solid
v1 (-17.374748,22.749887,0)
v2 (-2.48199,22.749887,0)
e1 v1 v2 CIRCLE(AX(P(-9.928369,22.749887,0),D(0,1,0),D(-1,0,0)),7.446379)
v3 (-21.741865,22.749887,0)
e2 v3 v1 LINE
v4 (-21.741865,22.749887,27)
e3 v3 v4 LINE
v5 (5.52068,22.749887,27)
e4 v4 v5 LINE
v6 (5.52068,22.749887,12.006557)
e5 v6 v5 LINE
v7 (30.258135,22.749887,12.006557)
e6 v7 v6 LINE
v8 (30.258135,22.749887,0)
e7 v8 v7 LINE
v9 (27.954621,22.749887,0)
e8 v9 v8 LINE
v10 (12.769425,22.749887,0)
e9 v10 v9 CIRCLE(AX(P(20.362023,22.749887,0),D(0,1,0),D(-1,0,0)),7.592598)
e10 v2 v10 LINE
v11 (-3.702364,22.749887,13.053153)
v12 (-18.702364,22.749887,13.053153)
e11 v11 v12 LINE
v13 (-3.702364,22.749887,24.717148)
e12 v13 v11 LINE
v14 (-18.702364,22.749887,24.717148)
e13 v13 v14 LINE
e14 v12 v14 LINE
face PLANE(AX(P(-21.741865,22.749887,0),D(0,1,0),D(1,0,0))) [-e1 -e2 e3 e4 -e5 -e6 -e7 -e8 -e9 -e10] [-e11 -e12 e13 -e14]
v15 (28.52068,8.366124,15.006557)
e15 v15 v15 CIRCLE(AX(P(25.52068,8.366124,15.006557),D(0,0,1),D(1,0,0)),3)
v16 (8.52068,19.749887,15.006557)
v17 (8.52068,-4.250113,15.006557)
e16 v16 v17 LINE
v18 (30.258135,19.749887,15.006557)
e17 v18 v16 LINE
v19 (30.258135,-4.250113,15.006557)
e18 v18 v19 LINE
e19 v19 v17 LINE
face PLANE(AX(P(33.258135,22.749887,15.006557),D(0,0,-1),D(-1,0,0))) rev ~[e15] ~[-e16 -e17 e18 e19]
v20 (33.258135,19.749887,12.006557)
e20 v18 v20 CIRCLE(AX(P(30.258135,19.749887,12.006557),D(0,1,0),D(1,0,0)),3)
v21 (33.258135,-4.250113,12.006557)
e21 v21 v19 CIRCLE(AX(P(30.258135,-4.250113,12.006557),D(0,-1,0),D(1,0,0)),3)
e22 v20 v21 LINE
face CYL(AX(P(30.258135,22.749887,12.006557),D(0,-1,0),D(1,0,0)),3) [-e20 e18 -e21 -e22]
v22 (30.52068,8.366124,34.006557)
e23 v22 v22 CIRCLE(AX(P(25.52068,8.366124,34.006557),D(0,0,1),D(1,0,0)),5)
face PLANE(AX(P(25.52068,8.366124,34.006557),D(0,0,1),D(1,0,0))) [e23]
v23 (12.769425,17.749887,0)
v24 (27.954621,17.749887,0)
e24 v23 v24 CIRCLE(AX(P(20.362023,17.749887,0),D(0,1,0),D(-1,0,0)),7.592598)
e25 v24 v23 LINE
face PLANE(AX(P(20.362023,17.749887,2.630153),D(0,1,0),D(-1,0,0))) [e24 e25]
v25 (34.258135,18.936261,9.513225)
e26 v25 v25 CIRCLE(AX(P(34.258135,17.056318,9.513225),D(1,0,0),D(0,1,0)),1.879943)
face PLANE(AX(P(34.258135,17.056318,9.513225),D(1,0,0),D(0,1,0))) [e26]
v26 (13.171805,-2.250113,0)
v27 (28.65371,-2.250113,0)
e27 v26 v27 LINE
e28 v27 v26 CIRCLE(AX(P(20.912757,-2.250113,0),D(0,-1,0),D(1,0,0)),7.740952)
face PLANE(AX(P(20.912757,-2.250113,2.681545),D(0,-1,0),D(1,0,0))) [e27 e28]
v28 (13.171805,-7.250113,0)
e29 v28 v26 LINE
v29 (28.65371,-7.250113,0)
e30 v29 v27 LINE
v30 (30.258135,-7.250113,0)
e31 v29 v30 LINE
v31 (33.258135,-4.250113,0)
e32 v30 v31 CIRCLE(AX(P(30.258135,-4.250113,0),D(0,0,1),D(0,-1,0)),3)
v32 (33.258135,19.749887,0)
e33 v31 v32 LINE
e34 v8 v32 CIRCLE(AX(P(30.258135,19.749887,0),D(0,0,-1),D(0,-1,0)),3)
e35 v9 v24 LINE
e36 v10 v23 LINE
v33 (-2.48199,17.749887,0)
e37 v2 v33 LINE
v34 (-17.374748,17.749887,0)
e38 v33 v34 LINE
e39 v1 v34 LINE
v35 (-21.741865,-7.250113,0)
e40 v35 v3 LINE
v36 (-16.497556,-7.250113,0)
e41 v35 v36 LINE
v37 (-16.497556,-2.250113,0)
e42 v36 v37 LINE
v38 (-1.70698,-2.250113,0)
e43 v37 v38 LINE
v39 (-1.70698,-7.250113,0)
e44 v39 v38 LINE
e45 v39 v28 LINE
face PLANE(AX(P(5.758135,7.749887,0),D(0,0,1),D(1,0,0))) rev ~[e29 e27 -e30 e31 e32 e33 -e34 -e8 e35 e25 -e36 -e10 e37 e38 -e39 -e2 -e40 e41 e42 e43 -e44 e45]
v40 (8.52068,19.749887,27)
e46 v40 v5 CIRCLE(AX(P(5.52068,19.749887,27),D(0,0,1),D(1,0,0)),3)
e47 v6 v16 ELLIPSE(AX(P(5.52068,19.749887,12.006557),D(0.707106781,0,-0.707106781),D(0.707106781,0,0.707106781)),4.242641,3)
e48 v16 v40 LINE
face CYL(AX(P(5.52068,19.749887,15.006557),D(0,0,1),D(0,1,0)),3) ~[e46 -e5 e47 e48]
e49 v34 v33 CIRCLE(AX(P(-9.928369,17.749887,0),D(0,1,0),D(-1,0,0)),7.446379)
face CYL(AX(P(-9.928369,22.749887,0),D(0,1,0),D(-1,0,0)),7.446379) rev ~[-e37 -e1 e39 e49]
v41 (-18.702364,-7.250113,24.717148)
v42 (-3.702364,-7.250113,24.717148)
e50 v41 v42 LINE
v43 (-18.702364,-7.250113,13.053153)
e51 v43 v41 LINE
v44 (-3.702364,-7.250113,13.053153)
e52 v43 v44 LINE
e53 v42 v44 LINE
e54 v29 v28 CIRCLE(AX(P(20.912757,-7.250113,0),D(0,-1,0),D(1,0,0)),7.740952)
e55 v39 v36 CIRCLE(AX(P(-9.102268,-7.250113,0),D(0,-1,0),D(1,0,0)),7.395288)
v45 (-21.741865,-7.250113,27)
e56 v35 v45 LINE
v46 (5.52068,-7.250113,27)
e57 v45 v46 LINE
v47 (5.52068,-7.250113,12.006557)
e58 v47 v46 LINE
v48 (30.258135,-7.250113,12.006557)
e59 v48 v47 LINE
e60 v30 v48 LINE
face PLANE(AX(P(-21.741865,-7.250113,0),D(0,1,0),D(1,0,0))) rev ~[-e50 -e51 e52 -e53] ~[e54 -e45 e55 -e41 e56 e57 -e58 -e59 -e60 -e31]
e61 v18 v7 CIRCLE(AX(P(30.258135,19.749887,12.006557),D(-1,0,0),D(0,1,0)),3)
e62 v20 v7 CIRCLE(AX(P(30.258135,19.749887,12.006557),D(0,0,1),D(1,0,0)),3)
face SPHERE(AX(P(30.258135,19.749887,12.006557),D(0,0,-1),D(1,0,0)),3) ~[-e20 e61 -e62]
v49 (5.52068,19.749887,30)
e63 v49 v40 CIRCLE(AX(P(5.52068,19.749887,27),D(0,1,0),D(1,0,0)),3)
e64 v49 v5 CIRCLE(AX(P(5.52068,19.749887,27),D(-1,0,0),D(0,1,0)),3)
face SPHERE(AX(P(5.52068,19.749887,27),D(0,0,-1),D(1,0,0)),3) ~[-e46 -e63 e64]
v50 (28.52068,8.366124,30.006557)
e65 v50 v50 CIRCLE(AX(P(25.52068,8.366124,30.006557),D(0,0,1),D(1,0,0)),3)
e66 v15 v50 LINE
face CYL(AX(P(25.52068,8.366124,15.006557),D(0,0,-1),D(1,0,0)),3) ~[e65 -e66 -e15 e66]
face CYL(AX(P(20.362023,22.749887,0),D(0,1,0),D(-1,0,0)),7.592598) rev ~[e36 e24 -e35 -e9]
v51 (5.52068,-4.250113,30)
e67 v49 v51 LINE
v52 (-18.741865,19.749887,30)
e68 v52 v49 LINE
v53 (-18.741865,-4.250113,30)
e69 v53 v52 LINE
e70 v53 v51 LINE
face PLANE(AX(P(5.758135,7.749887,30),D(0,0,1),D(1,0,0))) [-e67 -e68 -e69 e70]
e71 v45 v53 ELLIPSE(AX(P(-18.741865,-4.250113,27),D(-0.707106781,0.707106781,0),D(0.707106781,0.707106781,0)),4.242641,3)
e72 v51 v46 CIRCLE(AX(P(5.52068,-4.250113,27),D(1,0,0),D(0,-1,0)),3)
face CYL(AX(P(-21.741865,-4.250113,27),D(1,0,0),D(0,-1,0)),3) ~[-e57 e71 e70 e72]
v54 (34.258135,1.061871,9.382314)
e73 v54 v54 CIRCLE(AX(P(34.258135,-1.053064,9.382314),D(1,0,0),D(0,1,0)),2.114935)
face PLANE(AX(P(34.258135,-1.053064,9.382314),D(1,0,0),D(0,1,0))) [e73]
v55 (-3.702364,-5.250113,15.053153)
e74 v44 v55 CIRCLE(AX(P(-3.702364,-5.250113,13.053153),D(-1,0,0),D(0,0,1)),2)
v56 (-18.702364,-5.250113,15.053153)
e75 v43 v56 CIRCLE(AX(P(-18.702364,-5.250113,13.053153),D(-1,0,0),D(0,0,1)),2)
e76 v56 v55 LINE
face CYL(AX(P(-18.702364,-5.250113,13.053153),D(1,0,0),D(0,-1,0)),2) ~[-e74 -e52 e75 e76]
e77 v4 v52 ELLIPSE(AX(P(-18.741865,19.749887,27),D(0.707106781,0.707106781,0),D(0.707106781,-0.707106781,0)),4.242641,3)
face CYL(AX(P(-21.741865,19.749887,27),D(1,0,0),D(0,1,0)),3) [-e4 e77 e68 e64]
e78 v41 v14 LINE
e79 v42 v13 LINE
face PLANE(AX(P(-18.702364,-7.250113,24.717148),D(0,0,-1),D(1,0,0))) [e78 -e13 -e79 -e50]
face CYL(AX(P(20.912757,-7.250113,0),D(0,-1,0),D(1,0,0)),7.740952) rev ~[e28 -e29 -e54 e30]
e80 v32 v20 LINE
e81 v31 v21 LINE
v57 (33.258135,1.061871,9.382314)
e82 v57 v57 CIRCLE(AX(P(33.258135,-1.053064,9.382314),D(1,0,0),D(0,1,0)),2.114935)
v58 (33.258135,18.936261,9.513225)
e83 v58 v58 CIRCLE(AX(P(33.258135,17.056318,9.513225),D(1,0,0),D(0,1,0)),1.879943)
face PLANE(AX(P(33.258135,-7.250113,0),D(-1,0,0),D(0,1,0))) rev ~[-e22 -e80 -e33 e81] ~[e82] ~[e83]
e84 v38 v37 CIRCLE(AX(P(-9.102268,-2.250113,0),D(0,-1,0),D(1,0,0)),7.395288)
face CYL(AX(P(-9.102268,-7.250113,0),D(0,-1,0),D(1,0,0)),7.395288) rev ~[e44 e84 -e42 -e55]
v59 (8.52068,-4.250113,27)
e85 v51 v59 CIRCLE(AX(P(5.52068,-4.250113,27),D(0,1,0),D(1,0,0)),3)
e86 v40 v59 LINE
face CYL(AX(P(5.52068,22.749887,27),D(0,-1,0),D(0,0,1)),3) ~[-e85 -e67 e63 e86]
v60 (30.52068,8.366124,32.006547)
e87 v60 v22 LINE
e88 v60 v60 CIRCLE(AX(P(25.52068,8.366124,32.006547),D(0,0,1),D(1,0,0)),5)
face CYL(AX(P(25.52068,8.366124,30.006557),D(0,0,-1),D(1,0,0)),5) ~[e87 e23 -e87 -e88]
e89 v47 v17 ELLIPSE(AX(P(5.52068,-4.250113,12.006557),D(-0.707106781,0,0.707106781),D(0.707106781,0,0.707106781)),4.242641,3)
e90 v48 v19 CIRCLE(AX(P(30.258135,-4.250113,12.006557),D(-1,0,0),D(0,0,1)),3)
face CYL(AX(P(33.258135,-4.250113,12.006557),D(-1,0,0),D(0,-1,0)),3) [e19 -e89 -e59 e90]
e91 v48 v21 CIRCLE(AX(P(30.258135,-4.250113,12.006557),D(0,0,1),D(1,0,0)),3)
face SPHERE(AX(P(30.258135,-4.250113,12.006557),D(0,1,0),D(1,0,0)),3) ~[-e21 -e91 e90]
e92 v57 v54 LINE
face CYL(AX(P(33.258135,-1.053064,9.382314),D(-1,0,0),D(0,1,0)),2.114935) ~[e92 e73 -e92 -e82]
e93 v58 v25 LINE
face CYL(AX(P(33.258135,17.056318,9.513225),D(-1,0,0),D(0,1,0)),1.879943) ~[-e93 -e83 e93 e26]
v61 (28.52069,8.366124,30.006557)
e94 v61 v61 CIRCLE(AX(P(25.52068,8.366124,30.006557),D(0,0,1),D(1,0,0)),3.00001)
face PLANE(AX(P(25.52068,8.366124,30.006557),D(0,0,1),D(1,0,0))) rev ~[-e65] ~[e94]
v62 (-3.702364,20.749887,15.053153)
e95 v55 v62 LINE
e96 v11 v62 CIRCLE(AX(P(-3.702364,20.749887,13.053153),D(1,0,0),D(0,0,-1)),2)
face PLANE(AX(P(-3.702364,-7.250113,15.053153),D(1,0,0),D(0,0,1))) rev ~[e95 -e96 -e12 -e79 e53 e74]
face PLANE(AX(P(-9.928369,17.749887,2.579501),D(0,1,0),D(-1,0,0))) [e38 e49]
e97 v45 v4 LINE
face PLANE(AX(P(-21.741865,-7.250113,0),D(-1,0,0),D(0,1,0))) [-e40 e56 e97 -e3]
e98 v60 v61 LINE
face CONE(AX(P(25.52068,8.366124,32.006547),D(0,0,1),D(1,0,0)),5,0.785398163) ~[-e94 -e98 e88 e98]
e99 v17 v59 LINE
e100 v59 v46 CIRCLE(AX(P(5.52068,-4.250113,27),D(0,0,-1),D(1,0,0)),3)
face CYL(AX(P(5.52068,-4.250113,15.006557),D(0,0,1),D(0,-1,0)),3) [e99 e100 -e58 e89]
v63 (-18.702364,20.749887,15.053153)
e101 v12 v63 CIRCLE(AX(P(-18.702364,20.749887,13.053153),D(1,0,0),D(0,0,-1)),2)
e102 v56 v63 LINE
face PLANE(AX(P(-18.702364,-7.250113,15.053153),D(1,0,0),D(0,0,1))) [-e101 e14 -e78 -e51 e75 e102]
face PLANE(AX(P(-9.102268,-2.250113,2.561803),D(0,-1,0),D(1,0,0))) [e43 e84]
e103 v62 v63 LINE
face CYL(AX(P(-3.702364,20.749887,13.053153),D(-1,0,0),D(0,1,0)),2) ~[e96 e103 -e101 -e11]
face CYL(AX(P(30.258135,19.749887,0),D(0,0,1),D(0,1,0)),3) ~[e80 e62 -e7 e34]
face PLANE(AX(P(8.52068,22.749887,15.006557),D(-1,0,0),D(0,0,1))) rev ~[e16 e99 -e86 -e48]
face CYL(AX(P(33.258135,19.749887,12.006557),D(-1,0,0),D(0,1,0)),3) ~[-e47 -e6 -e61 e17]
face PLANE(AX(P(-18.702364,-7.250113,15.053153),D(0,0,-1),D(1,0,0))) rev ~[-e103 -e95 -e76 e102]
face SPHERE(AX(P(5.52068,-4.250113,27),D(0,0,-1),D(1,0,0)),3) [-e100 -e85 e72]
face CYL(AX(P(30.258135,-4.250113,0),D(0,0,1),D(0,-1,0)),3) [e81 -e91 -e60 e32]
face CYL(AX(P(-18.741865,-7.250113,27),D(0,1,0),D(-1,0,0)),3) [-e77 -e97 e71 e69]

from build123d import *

# Parameters (mm, degrees)
F0_W      = 55
F0_H      = 30
F1_DEPTH  = 30
F2_W      = 24.7374541685
F2_H      = 14.993442893
F3_DEPTH  = 35
F5_DEPTH  = 5
F7_DEPTH  = 5
F8_R      = 3
F9_W      = 15
F9_H      = 9.6639953554
F10_DEPTH = 33.1
F11_R     = 2
F12_R     = 2.1149349852
F12_R_2   = 1.8799425549
F13_DEPTH = 1
F14_R     = 3
F15_DEPTH = 15
F16_R     = 5
F17_DEPTH = 4
F18_SIZE  = 1.99999


# Not quite as in the source:
# - a fillet or chamfer is up to 0.001 mm smaller than in the source, because OpenCascade refuses the exact size


with BuildPart() as f1:
    # F0 (on Top) → F1 (new body)
    with BuildSketch(Plane.XY):
        with Locations((5.7581346482, 7.7498872403)):
            Rectangle(F0_W, F0_H)
    extrude(amount=F1_DEPTH)

    # F2 (on face) → F3 (cut)
    with BuildSketch(Plane(origin=(0, 22.7498872403, 0), x_dir=(-1, 0, 0), z_dir=(0, 1, 0))):
        with Locations((-20.889407564, 22.5032785535)):
            Rectangle(F2_W, F2_H)
    extrude(amount=-F3_DEPTH, mode=Mode.SUBTRACT)

    # F4 (on face) → F5 (cut)
    with BuildSketch(Plane(origin=(0, 22.7498872403, 0), x_dir=(-1, 0, 0), z_dir=(0, 1, 0))):
        with BuildLine():
            Line((-27.9546213446, 0), (-12.7694251838, 0))
            ThreePointArc((-12.7694251838, 0), (-20.3620232642, 7.5925980804), (-27.9546213446, 0))
        make_face()
        with BuildLine():
            ThreePointArc((17.3747475732, 0), (9.9283689633, 7.4463786099), (2.4819903534, 0))
            Line((2.4819903534, 0), (17.3747475732, 0))
        make_face()
    extrude(amount=-F5_DEPTH, mode=Mode.SUBTRACT)

    # F6 (on face) → F7 (cut)
    with BuildSketch(Plane.XZ.offset(7.2501127597)):
        with BuildLine():
            Line((-16.4975558603, 0), (-1.7069804287, 0))
            ThreePointArc((-1.7069804287, 0), (-9.1022681445, 7.3952877158), (-16.4975558603, 0))
        make_face()
        with BuildLine():
            ThreePointArc((28.6537096156, 0), (20.9127571434, 7.7409524722), (13.1718046712, 0))
            Line((13.1718046712, 0), (28.6537096156, 0))
        make_face()
    extrude(amount=-F7_DEPTH, mode=Mode.SUBTRACT)

    # F8
    f8_edges = [f1.edges().sort_by_distance(p)[0] for p in [
        (8.52068, -7.250113, 22.503279),
        (8.52068, 22.749887, 22.503279),
        (33.258135, 22.749887, 7.503279),
        (33.258135, 7.749887, 15.006557),
        (33.258135, -7.250113, 7.503279),
        (8.52068, 7.749887, 30),
        (-6.610592, 22.749887, 30),
        (-21.741865, 7.749887, 30),
        (20.889408, 22.749887, 15.006557),
        (20.889408, -7.250113, 15.006557),
        (-6.610592, -7.250113, 30),
    ]]
    fillet(f8_edges, radius=F8_R)

    # F9 (on face) → F10 (cut)
    with BuildSketch(Plane.XZ.offset(7.2501127597)):
        with Locations((-11.2023635954, 19.8851507157)):
            Rectangle(F9_W, F9_H)
    extrude(amount=-F10_DEPTH, mode=Mode.SUBTRACT)

    # F11
    f11_edges = [f1.edges().sort_by_distance(p)[0] for p in [
        (-11.202364, 22.749887, 15.053153),
        (-11.202364, -7.250113, 15.053153),
    ]]
    fillet(f11_edges, radius=F11_R)

    # F12 (on face) → F13 (join)
    with BuildSketch(Plane.YZ.offset(33.2581346482)):
        with Locations((-1.053063781, 9.3823140487)):
            Circle(F12_R)
        with Locations((17.056318, 9.5132254064)):
            Circle(F12_R_2)
    extrude(amount=F13_DEPTH)

    # F14 (on face) → F15 (join)
    with BuildSketch(Plane.XY.offset(15.006557107)):
        with Locations((25.5206804797, 8.3661237732)):
            Circle(F14_R)
    extrude(amount=F15_DEPTH)

    # F16 (on face) → F17 (join)
    with BuildSketch(Plane.XY.offset(30.006557107)):
        with Locations((25.5206804797, 8.3661237732)):
            Circle(F16_R)
    extrude(amount=F17_DEPTH)

    # F18 (size 2 in the source; OpenCascade refuses exactly that, so slightly less here)
    f18_edges = [f1.edges().sort_by_distance(p)[0] for p in [
        (20.52068, 8.366124, 30.006557),
    ]]
    chamfer(f18_edges, length=F18_SIZE)


solid = f1.part
